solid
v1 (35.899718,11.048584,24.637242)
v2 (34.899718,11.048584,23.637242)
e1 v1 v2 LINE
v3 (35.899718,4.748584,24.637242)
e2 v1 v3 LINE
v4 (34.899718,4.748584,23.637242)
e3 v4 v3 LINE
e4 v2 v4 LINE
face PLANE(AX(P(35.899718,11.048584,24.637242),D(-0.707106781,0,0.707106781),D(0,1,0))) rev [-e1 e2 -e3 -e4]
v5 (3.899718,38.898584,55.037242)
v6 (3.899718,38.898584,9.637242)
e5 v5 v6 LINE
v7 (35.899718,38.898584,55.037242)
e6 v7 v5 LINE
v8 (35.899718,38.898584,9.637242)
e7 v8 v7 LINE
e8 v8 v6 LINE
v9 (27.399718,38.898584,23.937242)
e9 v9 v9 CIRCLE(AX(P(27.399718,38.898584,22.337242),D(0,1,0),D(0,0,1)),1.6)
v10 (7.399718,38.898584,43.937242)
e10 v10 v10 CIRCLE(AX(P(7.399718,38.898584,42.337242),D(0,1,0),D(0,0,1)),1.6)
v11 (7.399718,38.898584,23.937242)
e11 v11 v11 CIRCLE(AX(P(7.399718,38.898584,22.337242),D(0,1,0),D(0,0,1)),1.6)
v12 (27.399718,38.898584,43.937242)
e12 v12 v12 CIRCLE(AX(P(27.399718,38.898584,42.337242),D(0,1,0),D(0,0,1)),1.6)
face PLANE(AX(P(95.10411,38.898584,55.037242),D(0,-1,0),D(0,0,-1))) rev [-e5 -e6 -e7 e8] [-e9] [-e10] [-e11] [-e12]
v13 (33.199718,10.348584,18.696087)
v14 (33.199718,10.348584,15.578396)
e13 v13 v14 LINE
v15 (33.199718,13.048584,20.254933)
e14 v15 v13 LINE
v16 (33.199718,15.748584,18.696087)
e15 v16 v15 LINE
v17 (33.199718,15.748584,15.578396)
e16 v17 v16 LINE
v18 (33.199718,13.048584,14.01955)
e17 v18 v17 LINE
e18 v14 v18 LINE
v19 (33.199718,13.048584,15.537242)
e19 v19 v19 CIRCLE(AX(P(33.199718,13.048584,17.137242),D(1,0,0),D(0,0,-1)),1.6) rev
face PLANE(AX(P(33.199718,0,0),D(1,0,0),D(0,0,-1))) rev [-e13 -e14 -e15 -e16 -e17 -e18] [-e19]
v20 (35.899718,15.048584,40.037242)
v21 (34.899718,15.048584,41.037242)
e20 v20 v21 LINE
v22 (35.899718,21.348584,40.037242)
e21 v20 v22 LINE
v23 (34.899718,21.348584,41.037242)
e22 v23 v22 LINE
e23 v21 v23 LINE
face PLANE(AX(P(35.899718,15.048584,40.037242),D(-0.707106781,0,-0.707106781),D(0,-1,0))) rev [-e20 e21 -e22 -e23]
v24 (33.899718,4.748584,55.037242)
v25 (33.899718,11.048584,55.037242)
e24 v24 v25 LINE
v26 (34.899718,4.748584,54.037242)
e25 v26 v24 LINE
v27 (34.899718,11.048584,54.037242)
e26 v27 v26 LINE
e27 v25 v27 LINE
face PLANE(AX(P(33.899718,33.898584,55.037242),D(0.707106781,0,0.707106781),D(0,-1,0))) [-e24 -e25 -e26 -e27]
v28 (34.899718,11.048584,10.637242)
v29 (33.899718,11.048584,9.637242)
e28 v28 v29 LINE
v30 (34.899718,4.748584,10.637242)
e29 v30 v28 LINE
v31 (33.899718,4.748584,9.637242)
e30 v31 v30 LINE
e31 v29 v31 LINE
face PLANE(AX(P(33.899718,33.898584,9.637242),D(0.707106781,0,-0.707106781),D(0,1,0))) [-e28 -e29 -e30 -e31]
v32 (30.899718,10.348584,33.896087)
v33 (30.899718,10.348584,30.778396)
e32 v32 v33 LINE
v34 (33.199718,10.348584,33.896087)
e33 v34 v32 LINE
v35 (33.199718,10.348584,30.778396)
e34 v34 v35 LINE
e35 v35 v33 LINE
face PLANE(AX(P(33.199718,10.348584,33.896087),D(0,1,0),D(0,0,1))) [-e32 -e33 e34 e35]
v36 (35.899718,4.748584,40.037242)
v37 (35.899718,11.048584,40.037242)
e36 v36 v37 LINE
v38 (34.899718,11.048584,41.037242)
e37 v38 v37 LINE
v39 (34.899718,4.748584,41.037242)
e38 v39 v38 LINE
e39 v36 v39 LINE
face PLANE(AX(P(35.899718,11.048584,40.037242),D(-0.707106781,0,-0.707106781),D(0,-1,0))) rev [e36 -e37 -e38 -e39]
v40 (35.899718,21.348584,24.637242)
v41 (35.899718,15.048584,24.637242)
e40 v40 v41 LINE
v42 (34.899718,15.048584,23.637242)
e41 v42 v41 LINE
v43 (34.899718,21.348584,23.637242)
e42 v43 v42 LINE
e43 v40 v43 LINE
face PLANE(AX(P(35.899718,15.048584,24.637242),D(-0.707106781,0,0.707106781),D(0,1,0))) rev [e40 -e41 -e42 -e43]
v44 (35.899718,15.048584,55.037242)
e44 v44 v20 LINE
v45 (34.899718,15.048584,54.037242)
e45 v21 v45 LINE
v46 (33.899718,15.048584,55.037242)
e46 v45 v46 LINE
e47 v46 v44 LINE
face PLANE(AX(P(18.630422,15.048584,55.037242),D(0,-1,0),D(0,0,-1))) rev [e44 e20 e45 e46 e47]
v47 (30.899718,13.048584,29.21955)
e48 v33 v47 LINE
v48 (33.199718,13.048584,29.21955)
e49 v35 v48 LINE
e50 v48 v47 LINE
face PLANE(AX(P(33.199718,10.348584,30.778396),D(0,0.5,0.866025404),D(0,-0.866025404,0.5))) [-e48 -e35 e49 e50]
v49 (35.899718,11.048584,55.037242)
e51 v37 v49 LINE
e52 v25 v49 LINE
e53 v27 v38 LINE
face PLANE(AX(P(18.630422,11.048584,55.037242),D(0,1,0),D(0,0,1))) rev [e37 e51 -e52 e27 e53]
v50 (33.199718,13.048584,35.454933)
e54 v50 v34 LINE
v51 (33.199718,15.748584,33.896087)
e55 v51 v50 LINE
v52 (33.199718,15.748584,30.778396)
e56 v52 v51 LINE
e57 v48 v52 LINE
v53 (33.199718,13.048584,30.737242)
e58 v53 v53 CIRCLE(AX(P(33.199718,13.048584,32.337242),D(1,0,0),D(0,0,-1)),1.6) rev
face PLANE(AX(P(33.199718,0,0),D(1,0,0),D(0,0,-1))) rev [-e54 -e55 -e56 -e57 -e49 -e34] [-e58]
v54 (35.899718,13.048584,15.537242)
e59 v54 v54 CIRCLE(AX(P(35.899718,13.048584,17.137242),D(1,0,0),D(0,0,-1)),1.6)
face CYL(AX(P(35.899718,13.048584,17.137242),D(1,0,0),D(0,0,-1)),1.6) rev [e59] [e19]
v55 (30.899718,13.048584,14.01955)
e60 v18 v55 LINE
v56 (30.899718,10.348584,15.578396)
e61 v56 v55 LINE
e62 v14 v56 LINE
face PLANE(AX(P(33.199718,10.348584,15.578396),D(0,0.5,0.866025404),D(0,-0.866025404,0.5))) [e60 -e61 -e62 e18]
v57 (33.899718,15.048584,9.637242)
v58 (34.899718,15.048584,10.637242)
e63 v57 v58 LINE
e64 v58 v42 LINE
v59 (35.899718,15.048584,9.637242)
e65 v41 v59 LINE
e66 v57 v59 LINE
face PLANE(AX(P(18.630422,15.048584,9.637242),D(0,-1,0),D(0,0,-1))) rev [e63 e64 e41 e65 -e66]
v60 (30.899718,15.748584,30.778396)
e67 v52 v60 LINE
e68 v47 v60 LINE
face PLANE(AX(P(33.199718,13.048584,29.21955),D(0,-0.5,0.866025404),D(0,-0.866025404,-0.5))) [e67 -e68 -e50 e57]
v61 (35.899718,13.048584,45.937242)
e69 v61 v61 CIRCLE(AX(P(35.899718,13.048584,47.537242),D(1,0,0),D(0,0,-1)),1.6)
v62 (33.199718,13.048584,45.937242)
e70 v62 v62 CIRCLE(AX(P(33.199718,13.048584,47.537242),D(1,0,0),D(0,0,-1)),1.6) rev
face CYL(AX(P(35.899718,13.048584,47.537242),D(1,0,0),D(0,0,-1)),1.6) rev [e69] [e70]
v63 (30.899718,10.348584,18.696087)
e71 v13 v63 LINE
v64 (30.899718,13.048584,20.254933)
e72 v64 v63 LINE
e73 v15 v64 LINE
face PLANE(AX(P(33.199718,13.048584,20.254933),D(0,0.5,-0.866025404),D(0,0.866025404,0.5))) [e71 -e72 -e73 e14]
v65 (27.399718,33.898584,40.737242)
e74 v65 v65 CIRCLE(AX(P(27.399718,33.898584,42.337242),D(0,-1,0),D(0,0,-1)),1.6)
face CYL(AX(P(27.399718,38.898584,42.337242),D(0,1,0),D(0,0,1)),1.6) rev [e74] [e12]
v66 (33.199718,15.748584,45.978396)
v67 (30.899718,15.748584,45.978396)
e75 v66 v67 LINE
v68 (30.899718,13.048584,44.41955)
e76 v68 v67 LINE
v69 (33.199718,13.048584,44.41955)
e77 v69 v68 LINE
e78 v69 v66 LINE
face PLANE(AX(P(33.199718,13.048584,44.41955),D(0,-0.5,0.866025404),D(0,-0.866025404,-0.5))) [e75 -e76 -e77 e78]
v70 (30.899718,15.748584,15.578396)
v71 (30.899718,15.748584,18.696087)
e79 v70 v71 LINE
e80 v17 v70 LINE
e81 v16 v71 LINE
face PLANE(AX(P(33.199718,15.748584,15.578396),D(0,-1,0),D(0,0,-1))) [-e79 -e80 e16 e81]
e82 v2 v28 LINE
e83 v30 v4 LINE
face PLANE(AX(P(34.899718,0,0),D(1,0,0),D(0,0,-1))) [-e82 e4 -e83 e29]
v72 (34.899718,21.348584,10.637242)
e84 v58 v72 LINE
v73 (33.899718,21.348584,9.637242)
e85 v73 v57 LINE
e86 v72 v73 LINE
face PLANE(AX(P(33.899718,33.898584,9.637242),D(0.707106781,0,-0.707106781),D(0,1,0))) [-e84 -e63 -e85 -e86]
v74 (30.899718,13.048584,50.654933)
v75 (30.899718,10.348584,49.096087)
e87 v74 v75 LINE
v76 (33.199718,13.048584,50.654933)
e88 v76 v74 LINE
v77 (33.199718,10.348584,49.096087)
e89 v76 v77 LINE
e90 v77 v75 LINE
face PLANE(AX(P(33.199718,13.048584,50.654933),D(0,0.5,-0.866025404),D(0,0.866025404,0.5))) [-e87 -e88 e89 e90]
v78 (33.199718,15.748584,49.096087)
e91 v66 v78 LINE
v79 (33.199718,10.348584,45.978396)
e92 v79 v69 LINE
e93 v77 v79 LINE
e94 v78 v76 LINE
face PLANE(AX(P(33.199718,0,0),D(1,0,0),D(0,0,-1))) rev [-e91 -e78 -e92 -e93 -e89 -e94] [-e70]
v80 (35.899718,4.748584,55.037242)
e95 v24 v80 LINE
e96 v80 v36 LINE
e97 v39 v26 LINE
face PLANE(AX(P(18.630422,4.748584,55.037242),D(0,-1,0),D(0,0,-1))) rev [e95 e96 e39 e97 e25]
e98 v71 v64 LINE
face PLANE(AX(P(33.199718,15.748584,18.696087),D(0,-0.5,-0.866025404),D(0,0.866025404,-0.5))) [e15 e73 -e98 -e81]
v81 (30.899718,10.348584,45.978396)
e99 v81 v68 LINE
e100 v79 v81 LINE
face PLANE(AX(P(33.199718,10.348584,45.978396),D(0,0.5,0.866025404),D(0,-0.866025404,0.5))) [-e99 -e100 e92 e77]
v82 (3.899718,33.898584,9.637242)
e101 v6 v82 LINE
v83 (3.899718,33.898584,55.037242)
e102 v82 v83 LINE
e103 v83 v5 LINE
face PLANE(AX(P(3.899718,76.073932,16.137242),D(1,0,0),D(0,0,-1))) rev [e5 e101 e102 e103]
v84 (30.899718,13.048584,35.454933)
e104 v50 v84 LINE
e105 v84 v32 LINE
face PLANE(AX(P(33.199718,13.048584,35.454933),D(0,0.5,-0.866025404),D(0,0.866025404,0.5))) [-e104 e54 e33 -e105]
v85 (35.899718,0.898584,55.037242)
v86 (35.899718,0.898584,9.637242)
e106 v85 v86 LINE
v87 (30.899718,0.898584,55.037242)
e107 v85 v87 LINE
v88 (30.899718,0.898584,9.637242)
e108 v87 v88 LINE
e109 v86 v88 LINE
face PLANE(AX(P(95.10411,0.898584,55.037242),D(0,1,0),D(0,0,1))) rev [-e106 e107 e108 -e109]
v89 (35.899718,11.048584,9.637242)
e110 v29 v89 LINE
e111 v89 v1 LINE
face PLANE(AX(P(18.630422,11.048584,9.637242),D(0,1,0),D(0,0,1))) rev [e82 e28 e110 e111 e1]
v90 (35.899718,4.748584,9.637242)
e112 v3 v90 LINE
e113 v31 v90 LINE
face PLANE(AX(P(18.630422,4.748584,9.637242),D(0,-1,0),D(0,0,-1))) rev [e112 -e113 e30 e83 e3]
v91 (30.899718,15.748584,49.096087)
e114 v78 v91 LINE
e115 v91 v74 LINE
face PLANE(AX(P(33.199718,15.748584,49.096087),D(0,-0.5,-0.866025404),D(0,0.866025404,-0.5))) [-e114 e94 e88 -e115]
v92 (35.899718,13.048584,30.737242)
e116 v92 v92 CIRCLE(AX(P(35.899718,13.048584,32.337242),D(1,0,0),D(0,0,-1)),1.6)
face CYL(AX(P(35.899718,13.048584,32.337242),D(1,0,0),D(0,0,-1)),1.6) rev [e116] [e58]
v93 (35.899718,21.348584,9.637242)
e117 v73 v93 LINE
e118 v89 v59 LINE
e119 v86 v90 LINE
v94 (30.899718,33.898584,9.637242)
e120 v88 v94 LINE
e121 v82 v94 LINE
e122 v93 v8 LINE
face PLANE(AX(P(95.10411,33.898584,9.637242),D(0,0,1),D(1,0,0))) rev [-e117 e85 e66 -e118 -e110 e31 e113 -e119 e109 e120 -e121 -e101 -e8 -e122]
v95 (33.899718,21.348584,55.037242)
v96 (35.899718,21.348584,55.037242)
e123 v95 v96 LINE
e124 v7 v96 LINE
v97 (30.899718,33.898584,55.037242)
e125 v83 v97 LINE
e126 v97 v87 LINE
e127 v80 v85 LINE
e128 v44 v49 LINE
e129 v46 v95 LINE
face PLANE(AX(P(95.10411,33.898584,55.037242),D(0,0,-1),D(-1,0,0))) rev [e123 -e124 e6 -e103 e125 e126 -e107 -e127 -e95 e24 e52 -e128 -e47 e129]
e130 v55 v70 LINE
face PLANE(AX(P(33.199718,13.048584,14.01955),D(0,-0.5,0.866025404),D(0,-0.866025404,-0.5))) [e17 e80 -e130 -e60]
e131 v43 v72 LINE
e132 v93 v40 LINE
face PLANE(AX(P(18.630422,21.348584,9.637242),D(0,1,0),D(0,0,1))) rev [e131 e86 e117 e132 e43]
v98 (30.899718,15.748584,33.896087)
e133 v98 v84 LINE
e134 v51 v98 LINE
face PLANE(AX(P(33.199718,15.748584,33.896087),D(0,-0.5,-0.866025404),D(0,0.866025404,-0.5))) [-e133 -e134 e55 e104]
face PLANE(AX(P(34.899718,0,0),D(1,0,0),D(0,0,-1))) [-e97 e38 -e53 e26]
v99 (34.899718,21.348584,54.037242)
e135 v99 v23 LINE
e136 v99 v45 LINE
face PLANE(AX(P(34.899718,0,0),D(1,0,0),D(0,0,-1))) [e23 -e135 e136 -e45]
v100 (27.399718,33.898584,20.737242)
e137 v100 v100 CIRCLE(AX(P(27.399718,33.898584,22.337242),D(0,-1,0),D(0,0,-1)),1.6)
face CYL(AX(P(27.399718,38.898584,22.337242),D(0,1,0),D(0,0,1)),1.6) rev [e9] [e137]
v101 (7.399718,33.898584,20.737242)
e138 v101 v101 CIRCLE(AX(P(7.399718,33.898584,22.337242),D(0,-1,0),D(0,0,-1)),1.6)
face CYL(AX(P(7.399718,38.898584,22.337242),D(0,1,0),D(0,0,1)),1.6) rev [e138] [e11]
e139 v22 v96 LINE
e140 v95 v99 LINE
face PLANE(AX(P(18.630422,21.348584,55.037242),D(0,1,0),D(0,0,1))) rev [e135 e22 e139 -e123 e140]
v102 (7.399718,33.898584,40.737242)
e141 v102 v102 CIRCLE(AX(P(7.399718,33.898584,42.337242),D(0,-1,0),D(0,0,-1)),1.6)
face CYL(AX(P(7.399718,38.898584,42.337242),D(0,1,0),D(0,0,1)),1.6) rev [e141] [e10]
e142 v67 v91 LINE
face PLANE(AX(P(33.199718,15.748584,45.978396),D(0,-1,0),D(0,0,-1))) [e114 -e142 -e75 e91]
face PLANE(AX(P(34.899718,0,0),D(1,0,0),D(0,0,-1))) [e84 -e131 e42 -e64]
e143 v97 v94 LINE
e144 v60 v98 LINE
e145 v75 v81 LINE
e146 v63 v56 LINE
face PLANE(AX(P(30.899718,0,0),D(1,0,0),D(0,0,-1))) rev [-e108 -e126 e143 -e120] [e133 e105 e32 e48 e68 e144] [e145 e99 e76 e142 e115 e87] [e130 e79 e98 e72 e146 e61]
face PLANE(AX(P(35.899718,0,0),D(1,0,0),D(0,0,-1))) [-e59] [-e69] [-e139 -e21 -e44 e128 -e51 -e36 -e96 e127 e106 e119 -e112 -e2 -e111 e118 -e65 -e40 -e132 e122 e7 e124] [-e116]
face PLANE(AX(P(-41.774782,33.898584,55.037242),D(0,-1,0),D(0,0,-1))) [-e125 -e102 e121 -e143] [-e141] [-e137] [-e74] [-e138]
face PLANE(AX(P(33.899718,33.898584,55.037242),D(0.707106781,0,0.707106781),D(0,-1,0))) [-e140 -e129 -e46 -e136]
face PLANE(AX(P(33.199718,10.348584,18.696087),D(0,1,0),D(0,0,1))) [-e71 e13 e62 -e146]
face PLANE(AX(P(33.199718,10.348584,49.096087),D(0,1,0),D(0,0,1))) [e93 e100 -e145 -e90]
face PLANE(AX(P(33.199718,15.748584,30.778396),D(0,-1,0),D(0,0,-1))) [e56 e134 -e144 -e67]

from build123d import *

# Parameters (mm, degrees)
MAIN_BLOCK_DEPTH                 = 5
BELT_START                       = -1
BELT_CLAMP_CUTOUT_SKETCH_W       = 15
BELT_CLAMP_CUTOUT_SKETCH_H       = 6.3
BELT_CLAMP_CUTOUT_DEPTH          = 1
BELT_CLAMP_SCREW_HOLES_D         = 3.2
BELT_CLAMP_SCREW_NUT_TRAPS_DEPTH = 2.3
BELT_GUIDE_CHAMFERS_SIZE         = 1
RAIL_MOUNT_BLOCK_SKETCH_W        = 45.4
RAIL_MOUNT_BLOCK_SKETCH_H        = 5
CARRIAGE_MOUNTING_BLOCK_DEPTH    = 27
CARRIAGE_MOUNTING_HOLES_D        = 3.2


with BuildPart() as part:
    # Main Block Sketch → Main Block (new body)
    with BuildSketch(Plane(origin=(30.899718474, 0, 0), x_dir=(0, 0, -1), z_dir=(1, 0, 0))):
        Polygon((-55.037241551, 38.898583536), (-9.637241551, 38.898583536), (-9.637241551, 33.898583536), (-9.637241551, 0.898583536), (-55.037241551, 0.898583536), (-55.037241551, 33.898583536), align=None)
    extrude(amount=MAIN_BLOCK_DEPTH)

    # Belt Clamp Cutout Sketch → Belt Clamp Cutout (cut)
    with BuildSketch(Plane(origin=(35.899718474, 0, 0), x_dir=(0, 0, -1), z_dir=(1, 0, 0)).offset(BELT_START)):
        with Locations((-47.537241551, 7.898583536)):
            Rectangle(BELT_CLAMP_CUTOUT_SKETCH_W, BELT_CLAMP_CUTOUT_SKETCH_H)
        with Locations((-17.137241551, 7.898583536)):
            Rectangle(BELT_CLAMP_CUTOUT_SKETCH_W, BELT_CLAMP_CUTOUT_SKETCH_H)
        with Locations((-17.137241551, 18.198583536)):
            Rectangle(BELT_CLAMP_CUTOUT_SKETCH_W, BELT_CLAMP_CUTOUT_SKETCH_H)
        with Locations((-47.537241551, 18.198583536)):
            Rectangle(BELT_CLAMP_CUTOUT_SKETCH_W, BELT_CLAMP_CUTOUT_SKETCH_H)
    extrude(amount=BELT_CLAMP_CUTOUT_DEPTH, mode=Mode.SUBTRACT)

    # Belt Clamp Screw Holes (through all)
    with Locations(Plane(origin=(35.899718474, 0, 0), x_dir=(0, 0, -1), z_dir=(1, 0, 0))):
        with Locations((-47.537241551, 13.048583536), (-17.137241551, 13.048583536), (-32.337241551, 13.048583536)):
            Hole(BELT_CLAMP_SCREW_HOLES_D / 2)

    # Nut Trap Sketch → Belt Clamp Screw Nut Traps (cut)
    with BuildSketch(Plane(origin=(30.899718474, 0, 0), x_dir=(0, 0, -1), z_dir=(1, 0, 0))):
        Polygon((-45.978395824, 15.748583536), (-49.096087278, 15.748583536), (-50.654933005, 13.048583536), (-49.096087278, 10.348583536), (-45.978395824, 10.348583536), (-44.419550097, 13.048583536), align=None)
        Polygon((-30.778395824, 15.748583536), (-33.896087278, 15.748583536), (-35.454933005, 13.048583536), (-33.896087278, 10.348583536), (-30.778395824, 10.348583536), (-29.219550097, 13.048583536), align=None)
        Polygon((-15.578395824, 15.748583536), (-18.696087278, 15.748583536), (-20.254933005, 13.048583536), (-18.696087278, 10.348583536), (-15.578395824, 10.348583536), (-14.019550097, 13.048583536), align=None)
    extrude(amount=BELT_CLAMP_SCREW_NUT_TRAPS_DEPTH, mode=Mode.SUBTRACT)

    # Belt Guide Chamfers
    belt_guide_chamfers_edges = [part.edges().sort_by_distance(p)[0] for p in [
        (34.899718474, 7.898583536, 40.037241551),
        (34.899718474, 18.198583536, 40.037241551),
        (34.899718474, 7.898583536, 24.637241551),
        (34.899718474, 18.198583536, 24.637241551),
    ]]
    chamfer(belt_guide_chamfers_edges, length=BELT_GUIDE_CHAMFERS_SIZE - 0.0001)  # a hair under: the kernel refuses the full size
    belt_guide_chamfers_2_edges = [part.edges().sort_by_distance(p)[0] for p in [
        (34.899718474, 18.198583536, 55.037241551),
        (34.899718474, 7.898583536, 55.037241551),
        (34.899718474, 7.898583536, 9.637241551),
        (34.899718474, 18.198583536, 9.637241551),
    ]]
    chamfer(belt_guide_chamfers_2_edges, length=BELT_GUIDE_CHAMFERS_SIZE)

    # Rail Mount Block Sketch → Carriage Mounting Block (add)
    with BuildSketch(Plane(origin=(30.899718474, 0, 0), x_dir=(0, 0, -1), z_dir=(1, 0, 0))):
        with Locations((-32.337241551, 36.398583536)):
            Rectangle(RAIL_MOUNT_BLOCK_SKETCH_W, RAIL_MOUNT_BLOCK_SKETCH_H)
    extrude(amount=-CARRIAGE_MOUNTING_BLOCK_DEPTH)

    # Carriage Mounting Holes (through all)
    with Locations(Plane(origin=(0, 38.898583536, 0), x_dir=(1, 0, 0), z_dir=(0, 1, 0))):
        with Locations((7.399718474, -42.337241551), (27.399718474, -42.337241551), (7.399718474, -22.337241551), (27.399718474, -22.337241551)):
            Hole(CARRIAGE_MOUNTING_HOLES_D / 2)


solid = part.part
